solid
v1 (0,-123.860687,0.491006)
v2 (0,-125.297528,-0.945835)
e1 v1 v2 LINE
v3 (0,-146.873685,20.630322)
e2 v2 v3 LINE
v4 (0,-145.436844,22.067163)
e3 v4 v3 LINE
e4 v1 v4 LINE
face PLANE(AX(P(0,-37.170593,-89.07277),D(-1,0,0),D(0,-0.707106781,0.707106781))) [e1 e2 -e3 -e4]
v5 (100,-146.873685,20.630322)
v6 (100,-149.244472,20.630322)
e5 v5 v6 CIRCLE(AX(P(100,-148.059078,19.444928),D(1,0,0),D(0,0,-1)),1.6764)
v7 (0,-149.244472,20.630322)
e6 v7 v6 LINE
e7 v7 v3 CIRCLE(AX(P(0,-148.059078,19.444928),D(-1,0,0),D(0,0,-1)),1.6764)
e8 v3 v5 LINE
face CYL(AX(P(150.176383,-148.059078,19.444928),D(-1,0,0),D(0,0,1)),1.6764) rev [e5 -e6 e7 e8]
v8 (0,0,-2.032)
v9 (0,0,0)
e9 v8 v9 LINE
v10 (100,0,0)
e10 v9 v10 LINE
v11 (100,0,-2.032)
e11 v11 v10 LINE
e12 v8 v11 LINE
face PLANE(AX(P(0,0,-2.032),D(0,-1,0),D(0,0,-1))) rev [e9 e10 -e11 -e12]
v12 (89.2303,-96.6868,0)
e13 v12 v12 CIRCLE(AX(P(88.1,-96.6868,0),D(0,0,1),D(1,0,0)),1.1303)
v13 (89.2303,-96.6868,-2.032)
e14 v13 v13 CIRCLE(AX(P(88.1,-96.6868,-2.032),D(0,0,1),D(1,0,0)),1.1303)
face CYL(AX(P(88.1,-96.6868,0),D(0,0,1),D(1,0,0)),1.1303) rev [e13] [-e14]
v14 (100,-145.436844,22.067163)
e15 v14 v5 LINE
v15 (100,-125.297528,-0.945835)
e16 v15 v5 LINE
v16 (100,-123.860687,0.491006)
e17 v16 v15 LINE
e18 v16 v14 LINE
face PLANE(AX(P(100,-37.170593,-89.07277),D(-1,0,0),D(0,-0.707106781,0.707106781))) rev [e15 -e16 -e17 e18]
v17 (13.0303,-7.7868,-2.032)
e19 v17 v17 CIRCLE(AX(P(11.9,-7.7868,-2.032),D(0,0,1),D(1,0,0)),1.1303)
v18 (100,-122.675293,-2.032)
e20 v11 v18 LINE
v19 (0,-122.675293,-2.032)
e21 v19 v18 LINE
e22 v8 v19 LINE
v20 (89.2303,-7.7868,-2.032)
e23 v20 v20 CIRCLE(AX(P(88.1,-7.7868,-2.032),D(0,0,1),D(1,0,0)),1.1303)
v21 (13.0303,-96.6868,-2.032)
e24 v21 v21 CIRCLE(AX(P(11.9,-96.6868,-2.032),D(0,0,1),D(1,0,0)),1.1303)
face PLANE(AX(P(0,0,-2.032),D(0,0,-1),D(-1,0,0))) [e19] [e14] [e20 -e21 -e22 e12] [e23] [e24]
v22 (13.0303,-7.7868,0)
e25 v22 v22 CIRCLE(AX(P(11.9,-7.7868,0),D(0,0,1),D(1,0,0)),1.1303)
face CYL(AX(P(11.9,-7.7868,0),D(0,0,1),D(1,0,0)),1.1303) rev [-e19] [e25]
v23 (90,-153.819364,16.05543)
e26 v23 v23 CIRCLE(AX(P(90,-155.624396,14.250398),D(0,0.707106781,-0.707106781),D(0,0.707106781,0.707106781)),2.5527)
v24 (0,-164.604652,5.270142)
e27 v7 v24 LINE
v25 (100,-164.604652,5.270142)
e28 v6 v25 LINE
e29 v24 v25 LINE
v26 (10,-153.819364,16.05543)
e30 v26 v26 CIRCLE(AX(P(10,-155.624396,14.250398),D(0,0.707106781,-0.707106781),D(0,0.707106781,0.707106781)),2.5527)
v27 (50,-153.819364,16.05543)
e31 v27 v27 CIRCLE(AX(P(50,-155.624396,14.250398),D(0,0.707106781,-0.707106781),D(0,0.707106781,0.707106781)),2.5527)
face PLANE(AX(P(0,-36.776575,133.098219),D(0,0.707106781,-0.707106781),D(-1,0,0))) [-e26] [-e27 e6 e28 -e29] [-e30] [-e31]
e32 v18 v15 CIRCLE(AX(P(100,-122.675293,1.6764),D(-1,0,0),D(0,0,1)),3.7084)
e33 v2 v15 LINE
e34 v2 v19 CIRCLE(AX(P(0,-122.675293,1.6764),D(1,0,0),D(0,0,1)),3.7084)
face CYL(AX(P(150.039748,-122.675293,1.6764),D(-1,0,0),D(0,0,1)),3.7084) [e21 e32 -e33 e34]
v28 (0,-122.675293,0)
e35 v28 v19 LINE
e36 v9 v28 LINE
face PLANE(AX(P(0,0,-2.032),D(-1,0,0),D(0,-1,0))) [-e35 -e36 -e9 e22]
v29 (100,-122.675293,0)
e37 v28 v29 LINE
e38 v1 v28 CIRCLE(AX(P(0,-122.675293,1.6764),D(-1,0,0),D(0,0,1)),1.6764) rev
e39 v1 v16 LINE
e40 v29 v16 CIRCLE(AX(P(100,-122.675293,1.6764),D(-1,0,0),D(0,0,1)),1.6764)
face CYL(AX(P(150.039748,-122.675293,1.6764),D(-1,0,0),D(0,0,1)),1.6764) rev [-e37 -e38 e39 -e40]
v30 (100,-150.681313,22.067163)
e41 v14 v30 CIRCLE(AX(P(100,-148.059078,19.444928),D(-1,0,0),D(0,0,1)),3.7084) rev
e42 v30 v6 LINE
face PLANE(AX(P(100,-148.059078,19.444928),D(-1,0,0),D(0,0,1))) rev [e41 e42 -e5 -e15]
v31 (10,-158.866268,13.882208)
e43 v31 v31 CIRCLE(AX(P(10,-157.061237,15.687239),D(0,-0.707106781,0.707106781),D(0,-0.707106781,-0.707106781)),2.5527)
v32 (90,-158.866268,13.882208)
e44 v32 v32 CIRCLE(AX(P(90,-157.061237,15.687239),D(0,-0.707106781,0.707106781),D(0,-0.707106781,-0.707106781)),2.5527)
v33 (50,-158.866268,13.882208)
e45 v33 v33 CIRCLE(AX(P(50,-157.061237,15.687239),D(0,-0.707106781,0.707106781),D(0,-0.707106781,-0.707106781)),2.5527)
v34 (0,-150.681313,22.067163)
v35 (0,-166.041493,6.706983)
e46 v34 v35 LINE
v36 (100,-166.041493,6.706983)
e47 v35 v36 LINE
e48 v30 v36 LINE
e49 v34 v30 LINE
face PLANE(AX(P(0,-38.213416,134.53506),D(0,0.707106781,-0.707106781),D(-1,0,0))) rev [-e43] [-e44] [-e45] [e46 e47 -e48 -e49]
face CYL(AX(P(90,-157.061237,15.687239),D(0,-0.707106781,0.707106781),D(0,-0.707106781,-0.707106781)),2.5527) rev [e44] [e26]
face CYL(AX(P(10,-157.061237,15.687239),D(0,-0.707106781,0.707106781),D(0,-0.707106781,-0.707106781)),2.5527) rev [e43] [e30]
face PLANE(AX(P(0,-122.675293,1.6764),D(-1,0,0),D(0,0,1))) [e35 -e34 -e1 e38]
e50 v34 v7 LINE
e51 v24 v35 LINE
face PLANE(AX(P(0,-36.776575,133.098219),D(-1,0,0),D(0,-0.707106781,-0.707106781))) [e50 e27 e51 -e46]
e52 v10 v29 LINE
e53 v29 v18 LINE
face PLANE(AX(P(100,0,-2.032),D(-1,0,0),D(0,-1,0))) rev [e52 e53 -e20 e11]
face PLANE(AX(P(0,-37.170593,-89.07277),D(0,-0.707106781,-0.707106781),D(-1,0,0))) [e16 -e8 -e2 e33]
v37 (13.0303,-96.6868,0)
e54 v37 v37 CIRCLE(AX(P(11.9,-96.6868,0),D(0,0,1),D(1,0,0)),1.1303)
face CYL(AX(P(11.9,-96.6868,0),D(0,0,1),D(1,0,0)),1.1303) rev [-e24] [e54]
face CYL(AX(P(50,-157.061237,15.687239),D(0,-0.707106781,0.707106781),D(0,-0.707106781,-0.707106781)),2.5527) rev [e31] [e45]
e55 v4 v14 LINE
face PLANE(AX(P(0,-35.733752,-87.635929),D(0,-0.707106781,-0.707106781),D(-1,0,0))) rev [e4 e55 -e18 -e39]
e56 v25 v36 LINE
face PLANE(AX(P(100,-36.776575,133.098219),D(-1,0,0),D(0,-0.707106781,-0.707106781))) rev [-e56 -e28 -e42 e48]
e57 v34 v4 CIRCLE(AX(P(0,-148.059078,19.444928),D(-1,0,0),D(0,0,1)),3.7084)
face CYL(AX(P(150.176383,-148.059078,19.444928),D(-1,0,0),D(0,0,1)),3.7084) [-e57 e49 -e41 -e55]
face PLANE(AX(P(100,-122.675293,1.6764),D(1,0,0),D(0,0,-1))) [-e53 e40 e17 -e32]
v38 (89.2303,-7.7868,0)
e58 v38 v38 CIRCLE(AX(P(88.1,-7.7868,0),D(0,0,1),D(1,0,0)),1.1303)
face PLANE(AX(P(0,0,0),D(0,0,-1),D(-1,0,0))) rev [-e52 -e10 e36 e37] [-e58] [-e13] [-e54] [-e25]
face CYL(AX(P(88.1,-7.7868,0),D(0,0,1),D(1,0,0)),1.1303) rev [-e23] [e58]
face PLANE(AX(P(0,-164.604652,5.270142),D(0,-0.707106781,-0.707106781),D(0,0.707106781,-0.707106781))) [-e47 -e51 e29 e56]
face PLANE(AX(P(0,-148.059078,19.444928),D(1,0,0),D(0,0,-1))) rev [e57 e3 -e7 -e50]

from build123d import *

# Parameters (mm, degrees)
SKETCH1_W               = 100
SKETCH1_H               = 180.7762
BASE_FLANGE1_DEPTH      = 2.032
SKETCHED_BEND1_DEPTH    = 100
SKETCHED_BEND1_2_DEPTH  = 100
SKETCHED_BEND2_DEPTH    = 100
SKETCHED_BEND2_2_DEPTH  = 100
CUT_EXTRUDE1_DEPTH      = 196.207207632
CUT_EXTRUDE1_DEPTH_BACK = 196.207207632
SKETCH1_4_R             = 1.13
F_4_40_TAPPED_HOLE1_D   = 2.2606
SKETCH11_R              = 2.5
CUT_EXTRUDE2_DEPTH      = 2.032
F_1_4_20_TAPPED_HOLE3_D = 5.1054


# Read off the part's stored shape, not the designer's step: Sketched Bend1, Sketched Bend2
# Sheet-metal steps are written as plain solids
with BuildPart() as part:
    # Sketch1 → Base-Flange1 (new body)
    with BuildSketch(Plane.XY):
        with Locations((50, -90.3881)):
            Rectangle(SKETCH1_W, SKETCH1_H)
    extrude(amount=-BASE_FLANGE1_DEPTH)

    # Sketched Bend1 outline → Sketched Bend1 (cut)
    with BuildSketch(Plane.YZ):
        with BuildLine():
            Line((-125.297528233, -0.945834787), (-126.24336302, 0))
            Line((-126.24336302, 0), (-180.7762, 0))
            Line((-180.7762, 0), (-180.7762, -2.032))
            Line((-180.7762, -2.032), (-122.675293446, -2.032))
            ThreePointArc((-122.675293446, -2.032), (-124.094436686, -1.749714858), (-125.297528233, -0.945834787))
        make_face()
    extrude(amount=SKETCHED_BEND1_DEPTH, mode=Mode.SUBTRACT)

    # Sketched Bend1 2 outline → Sketched Bend1 2 (add)
    with BuildSketch(Plane.YZ):
        with BuildLine():
            Line((-163.561829245, 40.192148183), (-164.998670225, 38.755307204))
            Line((-164.998670225, 38.755307204), (-126.24336302, 0))
            Line((-126.24336302, 0), (-122.675293446, 0))
            ThreePointArc((-122.675293446, 0), (-123.316823952, 0.127608352), (-123.860687254, 0.491006192))
            Line((-123.860687254, 0.491006192), (-163.561829245, 40.192148183))
        make_face()
    extrude(amount=SKETCHED_BEND1_2_DEPTH)

    # Sketched Bend2 outline → Sketched Bend2 (cut)
    with BuildSketch(Plane.YZ):
        with BuildLine():
            Line((-164.998670225, 38.755307204), (-149.212692342, 22.969329321))
            ThreePointArc((-149.212692342, 22.969329321), (-147.197284992, 23.051802202), (-145.43684371, 22.067162648))
            Line((-145.43684371, 22.067162648), (-163.561829245, 40.192148183))
            Line((-163.561829245, 40.192148183), (-164.998670225, 38.755307204))
        make_face()
    extrude(amount=SKETCHED_BEND2_DEPTH, mode=Mode.SUBTRACT)

    # Sketched Bend2 2 outline → Sketched Bend2 2 (add)
    with BuildSketch(Plane.YZ):
        with BuildLine():
            Line((-164.604651788, 5.270142185), (-149.244472305, 20.630321668))
            ThreePointArc((-149.244472305, 20.630321668), (-148.059078497, 21.12132786), (-146.873684689, 20.630321668))
            Line((-146.873684689, 20.630321668), (-149.212692342, 22.969329321))
            ThreePointArc((-149.212692342, 22.969329321), (-150.000143771, 22.604753197), (-150.681313284, 22.067162648))
            Line((-150.681313284, 22.067162648), (-166.041492767, 6.706983165))
            Line((-166.041492767, 6.706983165), (-164.604651788, 5.270142185))
        make_face()
    extrude(amount=SKETCHED_BEND2_2_DEPTH)

    # Sketch1<4> → Cut-Extrude1 (cut, two sides: drawn at the far end of the back side and taken through both)
    with BuildSketch(Plane.XY.offset(-CUT_EXTRUDE1_DEPTH_BACK)):
        with Locations((11.9, -7.7868)):
            Circle(SKETCH1_4_R)
        with Locations((88.1, -7.7868)):
            Circle(SKETCH1_4_R)
        with Locations((88.1, -96.6868)):
            Circle(SKETCH1_4_R)
        with Locations((11.9, -96.6868)):
            Circle(SKETCH1_4_R)
    extrude(amount=CUT_EXTRUDE1_DEPTH + CUT_EXTRUDE1_DEPTH_BACK, mode=Mode.SUBTRACT)

    # #4-40 Tapped Hole1 (through all)
    with Locations(Plane(origin=(88.1, -96.6868, 0), x_dir=(1, 0, 0), z_dir=(0, 0, 1))):
        with Locations((0, 0), (-76.2, 0), (-76.2, 88.9), (0, 88.9)):
            Hole(F_4_40_TAPPED_HOLE1_D / 2)

    # Sketch11 → Cut-Extrude2 (cut)
    with BuildSketch(Plane(origin=(0, -86.374237966, 86.374237966), x_dir=(-1, 0, 0), z_dir=(0, -0.7071067811865487, 0.7071067811865465))):
        with Locations(Location((-10, 99.966512217, 0), (0, 0, 90))):
            Circle(SKETCH11_R)
        with Locations(Location((-50, 99.966512217, 0), (0, 0, 90))):
            Circle(SKETCH11_R)
        with Locations(Location((-90, 99.966512217, 0), (0, 0, 90))):
            Circle(SKETCH11_R)
    extrude(amount=-CUT_EXTRUDE2_DEPTH, mode=Mode.SUBTRACT)

    # 1/4-20 Tapped Hole3 (through all)
    with Locations(Plane(origin=(0, -86.374237966, 86.374237966), x_dir=(-1, 0, 0), z_dir=(0, -0.7071067811865487, 0.7071067811865465))):
        with Locations((-90, 99.966512217), (-50, 99.966512217), (-10, 99.966512217)):
            Hole(F_1_4_20_TAPPED_HOLE3_D / 2)


solid = part.part
